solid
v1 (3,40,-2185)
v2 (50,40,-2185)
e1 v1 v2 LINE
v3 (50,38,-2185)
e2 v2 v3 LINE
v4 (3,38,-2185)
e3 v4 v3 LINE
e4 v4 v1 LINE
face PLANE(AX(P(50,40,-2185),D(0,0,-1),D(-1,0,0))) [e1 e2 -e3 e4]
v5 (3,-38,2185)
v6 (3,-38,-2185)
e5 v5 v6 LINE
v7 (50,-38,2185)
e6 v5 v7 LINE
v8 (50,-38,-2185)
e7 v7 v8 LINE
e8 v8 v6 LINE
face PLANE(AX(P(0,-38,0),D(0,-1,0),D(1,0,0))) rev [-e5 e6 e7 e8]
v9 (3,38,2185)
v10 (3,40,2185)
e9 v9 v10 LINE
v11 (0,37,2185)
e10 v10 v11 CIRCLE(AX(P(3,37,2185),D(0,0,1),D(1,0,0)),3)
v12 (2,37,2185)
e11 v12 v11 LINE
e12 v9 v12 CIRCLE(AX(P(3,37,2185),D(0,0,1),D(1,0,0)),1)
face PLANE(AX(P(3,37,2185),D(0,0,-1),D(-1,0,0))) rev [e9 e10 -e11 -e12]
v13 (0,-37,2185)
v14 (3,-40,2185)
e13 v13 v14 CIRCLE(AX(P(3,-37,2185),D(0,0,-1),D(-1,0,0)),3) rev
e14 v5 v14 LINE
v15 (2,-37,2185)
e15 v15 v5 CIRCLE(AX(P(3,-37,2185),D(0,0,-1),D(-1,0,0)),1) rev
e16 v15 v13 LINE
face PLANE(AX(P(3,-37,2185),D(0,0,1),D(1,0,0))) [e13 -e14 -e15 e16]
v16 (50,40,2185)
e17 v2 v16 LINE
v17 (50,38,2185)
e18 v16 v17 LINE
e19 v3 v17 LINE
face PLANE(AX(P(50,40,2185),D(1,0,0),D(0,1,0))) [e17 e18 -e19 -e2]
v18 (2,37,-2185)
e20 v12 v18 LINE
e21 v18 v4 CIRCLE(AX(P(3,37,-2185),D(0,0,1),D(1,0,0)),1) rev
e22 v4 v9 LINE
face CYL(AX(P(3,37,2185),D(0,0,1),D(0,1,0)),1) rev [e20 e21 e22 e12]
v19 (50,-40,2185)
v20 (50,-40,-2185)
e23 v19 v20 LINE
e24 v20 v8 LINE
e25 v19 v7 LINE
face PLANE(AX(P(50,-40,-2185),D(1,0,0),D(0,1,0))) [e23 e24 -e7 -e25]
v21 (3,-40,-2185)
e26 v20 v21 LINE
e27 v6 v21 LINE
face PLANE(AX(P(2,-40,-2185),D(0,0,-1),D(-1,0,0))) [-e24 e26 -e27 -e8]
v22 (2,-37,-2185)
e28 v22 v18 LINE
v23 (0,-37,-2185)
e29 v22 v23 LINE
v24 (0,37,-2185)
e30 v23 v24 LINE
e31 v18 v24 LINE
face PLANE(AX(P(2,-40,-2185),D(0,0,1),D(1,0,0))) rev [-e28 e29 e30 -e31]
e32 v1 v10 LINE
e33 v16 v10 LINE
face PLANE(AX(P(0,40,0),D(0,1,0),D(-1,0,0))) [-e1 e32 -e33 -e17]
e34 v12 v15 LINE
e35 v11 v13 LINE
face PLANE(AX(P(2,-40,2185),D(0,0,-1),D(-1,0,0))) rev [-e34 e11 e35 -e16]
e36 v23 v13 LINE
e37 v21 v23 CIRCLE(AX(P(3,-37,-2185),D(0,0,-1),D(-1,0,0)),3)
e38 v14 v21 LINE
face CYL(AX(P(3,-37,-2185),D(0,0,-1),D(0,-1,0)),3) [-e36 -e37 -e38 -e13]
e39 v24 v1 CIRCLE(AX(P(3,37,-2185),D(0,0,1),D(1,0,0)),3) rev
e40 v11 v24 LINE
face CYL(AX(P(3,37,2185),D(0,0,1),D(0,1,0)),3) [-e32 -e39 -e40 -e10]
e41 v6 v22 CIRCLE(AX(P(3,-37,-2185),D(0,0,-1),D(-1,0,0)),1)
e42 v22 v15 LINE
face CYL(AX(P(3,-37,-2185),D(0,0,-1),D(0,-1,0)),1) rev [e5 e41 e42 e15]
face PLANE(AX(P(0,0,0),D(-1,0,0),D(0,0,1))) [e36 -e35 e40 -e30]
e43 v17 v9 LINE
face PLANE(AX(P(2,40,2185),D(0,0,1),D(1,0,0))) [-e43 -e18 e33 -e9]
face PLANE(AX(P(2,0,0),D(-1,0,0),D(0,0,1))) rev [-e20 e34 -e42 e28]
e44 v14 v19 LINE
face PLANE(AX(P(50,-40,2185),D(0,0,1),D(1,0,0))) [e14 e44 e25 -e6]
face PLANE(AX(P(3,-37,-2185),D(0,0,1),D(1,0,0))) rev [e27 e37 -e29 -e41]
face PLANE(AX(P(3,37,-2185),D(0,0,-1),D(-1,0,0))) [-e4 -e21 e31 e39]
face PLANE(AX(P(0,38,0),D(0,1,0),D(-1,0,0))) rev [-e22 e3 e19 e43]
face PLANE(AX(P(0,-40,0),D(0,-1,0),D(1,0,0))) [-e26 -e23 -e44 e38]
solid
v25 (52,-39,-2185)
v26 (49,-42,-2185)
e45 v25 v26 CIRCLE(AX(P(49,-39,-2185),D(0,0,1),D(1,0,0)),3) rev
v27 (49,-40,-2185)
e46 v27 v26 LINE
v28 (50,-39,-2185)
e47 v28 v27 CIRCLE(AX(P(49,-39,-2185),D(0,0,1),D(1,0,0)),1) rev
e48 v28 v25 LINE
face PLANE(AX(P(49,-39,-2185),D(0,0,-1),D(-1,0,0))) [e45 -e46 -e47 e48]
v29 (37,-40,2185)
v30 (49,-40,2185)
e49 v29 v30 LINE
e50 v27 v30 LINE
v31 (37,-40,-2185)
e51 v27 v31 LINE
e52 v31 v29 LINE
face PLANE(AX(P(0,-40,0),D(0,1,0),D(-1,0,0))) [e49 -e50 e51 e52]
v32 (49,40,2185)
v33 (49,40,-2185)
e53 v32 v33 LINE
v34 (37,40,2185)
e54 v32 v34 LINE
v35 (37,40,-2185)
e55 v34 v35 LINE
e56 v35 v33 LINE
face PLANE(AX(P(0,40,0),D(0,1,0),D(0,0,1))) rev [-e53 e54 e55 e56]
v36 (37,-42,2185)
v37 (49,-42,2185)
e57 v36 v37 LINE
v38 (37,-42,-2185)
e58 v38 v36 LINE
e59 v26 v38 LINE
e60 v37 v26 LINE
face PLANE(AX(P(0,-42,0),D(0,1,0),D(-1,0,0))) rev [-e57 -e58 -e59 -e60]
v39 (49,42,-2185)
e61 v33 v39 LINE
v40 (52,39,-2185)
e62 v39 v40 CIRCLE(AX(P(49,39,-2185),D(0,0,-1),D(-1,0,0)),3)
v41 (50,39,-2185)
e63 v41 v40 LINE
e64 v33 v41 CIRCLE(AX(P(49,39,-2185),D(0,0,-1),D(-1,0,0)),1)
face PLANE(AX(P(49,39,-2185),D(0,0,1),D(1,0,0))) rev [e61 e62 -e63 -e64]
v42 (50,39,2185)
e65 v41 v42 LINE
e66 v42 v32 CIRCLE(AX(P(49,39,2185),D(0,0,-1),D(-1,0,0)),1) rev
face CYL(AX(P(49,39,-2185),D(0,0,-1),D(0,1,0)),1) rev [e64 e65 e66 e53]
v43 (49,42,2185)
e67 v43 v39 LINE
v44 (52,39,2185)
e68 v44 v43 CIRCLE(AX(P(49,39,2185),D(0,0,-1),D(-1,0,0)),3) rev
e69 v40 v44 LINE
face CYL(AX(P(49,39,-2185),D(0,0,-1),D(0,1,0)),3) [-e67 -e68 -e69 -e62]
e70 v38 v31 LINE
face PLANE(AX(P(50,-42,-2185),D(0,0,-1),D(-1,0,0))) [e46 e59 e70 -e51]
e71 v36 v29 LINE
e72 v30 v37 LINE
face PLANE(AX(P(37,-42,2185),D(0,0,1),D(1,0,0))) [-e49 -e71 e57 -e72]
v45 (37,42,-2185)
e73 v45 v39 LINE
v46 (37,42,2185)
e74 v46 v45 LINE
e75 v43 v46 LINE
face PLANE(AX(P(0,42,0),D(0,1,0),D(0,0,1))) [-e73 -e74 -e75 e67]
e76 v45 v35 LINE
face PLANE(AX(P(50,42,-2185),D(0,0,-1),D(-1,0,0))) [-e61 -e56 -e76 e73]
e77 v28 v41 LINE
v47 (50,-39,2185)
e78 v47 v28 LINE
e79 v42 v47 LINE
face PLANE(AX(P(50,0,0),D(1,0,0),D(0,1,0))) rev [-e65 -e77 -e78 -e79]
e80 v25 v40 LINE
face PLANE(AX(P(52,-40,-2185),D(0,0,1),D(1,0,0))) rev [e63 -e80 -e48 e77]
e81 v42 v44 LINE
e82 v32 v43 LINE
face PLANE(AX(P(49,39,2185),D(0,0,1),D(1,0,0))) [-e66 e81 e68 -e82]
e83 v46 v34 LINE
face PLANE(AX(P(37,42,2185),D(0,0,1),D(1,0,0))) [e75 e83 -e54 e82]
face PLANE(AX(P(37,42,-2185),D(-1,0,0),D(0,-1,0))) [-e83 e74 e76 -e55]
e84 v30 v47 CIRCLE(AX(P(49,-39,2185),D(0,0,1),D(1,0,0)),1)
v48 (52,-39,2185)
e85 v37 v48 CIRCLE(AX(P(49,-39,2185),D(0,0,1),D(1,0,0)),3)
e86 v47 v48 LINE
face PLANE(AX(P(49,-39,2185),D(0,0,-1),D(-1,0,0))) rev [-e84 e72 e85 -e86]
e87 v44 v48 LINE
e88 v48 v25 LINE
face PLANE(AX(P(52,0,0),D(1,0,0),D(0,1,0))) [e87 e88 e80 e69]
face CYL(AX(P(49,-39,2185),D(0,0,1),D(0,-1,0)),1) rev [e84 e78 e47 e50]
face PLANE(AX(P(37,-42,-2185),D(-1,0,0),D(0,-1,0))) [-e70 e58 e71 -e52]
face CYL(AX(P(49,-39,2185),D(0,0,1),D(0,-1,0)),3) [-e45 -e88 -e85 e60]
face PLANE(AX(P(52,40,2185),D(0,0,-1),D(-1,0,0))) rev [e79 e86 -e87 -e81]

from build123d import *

# Parameters (mm, degrees)
SKETCH1_W                      = 4370
SKETCH1_H                      = 80
BASE_FLANGE1_DEPTH             = 2
EDGE_FLANGE1_STRIP_W           = 10
EDGE_FLANGE1_STRIP_H           = 2
EDGE_FLANGE1_STRIP_CUT_DEPTH   = 4370
EDGE_FLANGE1_STRIP_2_W         = 10
EDGE_FLANGE1_STRIP_2_H         = 2
EDGE_FLANGE1_STRIP_CUT_2_DEPTH = 4370
EDGE_FLANGE1_DEPTH             = 4370
EDGE_FLANGE1_BEND_DEPTH        = 4370
SKETCH13_W                     = 4370
SKETCH13_H                     = 80
BASE_FLANGE2_DEPTH             = 2
EDGE_FLANGE2_STRIP_W           = 10
EDGE_FLANGE2_STRIP_H           = 2
EDGE_FLANGE2_STRIP_CUT_DEPTH   = 4370
EDGE_FLANGE2_STRIP_2_W         = 10
EDGE_FLANGE2_STRIP_2_H         = 2
EDGE_FLANGE2_STRIP_CUT_2_DEPTH = 4370
EDGE_FLANGE2_DEPTH             = 4370
EDGE_FLANGE2_BEND_DEPTH        = 4370


# Sheet-metal steps are written as plain solids
with BuildPart() as part:
    # Sketch1 → Base-Flange1 (new body)
    with BuildSketch(Plane(origin=(0, 0, 0), x_dir=(0, 0, -1), z_dir=(1, 0, 0))):
        Rectangle(SKETCH1_W, SKETCH1_H)
    extrude(amount=BASE_FLANGE1_DEPTH)

    # Edge-Flange1 strip (across the edge) → Edge-Flange1 strip cut (cut)
    with BuildSketch(Plane(origin=(2, 40, -2185), x_dir=(0, -1, 0), z_dir=(0, 0, 1))):
        with Locations((-2, -1)):
            Rectangle(EDGE_FLANGE1_STRIP_W, EDGE_FLANGE1_STRIP_H)
    extrude(amount=EDGE_FLANGE1_STRIP_CUT_DEPTH, mode=Mode.SUBTRACT)

    # Edge-Flange1 strip 2 (across the edge) → Edge-Flange1 strip cut 2 (cut)
    with BuildSketch(Plane(origin=(2, -40, 2185), x_dir=(0, 1, 0), z_dir=(0, 0, -1))):
        with Locations((-2, -1)):
            Rectangle(EDGE_FLANGE1_STRIP_2_W, EDGE_FLANGE1_STRIP_2_H)
    extrude(amount=EDGE_FLANGE1_STRIP_CUT_2_DEPTH, mode=Mode.SUBTRACT)

    # Edge-Flange1 section (across the edge) → Edge-Flange1 (add)
    with BuildSketch(Plane(origin=(2, 40, -2185), x_dir=(0, -1, 0), z_dir=(0, 0, 1))):
        with BuildLine():
            Line((0, 1), (0, 48))
            Line((0, 48), (2, 48))
            Line((2, 48), (2, 1))
            ThreePointArc((2, 1), (2.292893219, 0.292893219), (3, 0))
            Line((3, 0), (3, -2))
            ThreePointArc((3, -2), (0.878679656, -1.121320344), (0, 1))
        make_face()
    extrude(amount=EDGE_FLANGE1_DEPTH)

    # Edge-Flange1 section 2 (across the edge) → Edge-Flange1 bend (add)
    with BuildSketch(Plane(origin=(2, -40, 2185), x_dir=(0, 1, 0), z_dir=(0, 0, -1))):
        with BuildLine():
            Line((0, 1), (0, 48))
            Line((0, 48), (2, 48))
            Line((2, 48), (2, 1))
            ThreePointArc((2, 1), (2.292893219, 0.292893219), (3, 0))
            Line((3, 0), (3, -2))
            ThreePointArc((3, -2), (0.878679656, -1.121320344), (0, 1))
        make_face()
    extrude(amount=EDGE_FLANGE1_BEND_DEPTH)


with BuildPart() as body_2:
    # Sketch13 → Base-Flange2 (new body)
    with BuildSketch(Plane(origin=(50, 0, 0), x_dir=(0, 0, -1), z_dir=(1, 0, 0))):
        Rectangle(SKETCH13_W, SKETCH13_H)
    extrude(amount=BASE_FLANGE2_DEPTH)

    # Edge-Flange2 strip (across the edge) → Edge-Flange2 strip cut (cut)
    with BuildSketch(Plane(origin=(50, 40, 2185), x_dir=(0, -1, 0), z_dir=(0, 0, -1))):
        with Locations((-4, -1)):
            Rectangle(EDGE_FLANGE2_STRIP_W, EDGE_FLANGE2_STRIP_H)
    extrude(amount=EDGE_FLANGE2_STRIP_CUT_DEPTH, mode=Mode.SUBTRACT)

    # Edge-Flange2 strip 2 (across the edge) → Edge-Flange2 strip cut 2 (cut)
    with BuildSketch(Plane(origin=(50, -40, -2185), x_dir=(0, 1, 0), z_dir=(0, 0, 1))):
        with Locations((-4, -1)):
            Rectangle(EDGE_FLANGE2_STRIP_2_W, EDGE_FLANGE2_STRIP_2_H)
    extrude(amount=EDGE_FLANGE2_STRIP_CUT_2_DEPTH, mode=Mode.SUBTRACT)

    # Edge-Flange2 section (across the edge) → Edge-Flange2 (add)
    with BuildSketch(Plane(origin=(50, 40, 2185), x_dir=(0, -1, 0), z_dir=(0, 0, -1))):
        with BuildLine():
            Line((-2, 1), (-2, 13))
            Line((-2, 13), (0, 13))
            Line((0, 13), (0, 1))
            ThreePointArc((0, 1), (0.292893219, 0.292893219), (1, 0))
            Line((1, 0), (1, -2))
            ThreePointArc((1, -2), (-1.121320344, -1.121320344), (-2, 1))
        make_face()
    extrude(amount=EDGE_FLANGE2_DEPTH)

    # Edge-Flange2 section 2 (across the edge) → Edge-Flange2 bend (add)
    with BuildSketch(Plane(origin=(50, -40, -2185), x_dir=(0, 1, 0), z_dir=(0, 0, 1))):
        with BuildLine():
            Line((-2, 1), (-2, 13))
            Line((-2, 13), (0, 13))
            Line((0, 13), (0, 1))
            ThreePointArc((0, 1), (0.292893219, 0.292893219), (1, 0))
            Line((1, 0), (1, -2))
            ThreePointArc((1, -2), (-1.121320344, -1.121320344), (-2, 1))
        make_face()
    extrude(amount=EDGE_FLANGE2_BEND_DEPTH)


solid = Compound([part.part, body_2.part])
